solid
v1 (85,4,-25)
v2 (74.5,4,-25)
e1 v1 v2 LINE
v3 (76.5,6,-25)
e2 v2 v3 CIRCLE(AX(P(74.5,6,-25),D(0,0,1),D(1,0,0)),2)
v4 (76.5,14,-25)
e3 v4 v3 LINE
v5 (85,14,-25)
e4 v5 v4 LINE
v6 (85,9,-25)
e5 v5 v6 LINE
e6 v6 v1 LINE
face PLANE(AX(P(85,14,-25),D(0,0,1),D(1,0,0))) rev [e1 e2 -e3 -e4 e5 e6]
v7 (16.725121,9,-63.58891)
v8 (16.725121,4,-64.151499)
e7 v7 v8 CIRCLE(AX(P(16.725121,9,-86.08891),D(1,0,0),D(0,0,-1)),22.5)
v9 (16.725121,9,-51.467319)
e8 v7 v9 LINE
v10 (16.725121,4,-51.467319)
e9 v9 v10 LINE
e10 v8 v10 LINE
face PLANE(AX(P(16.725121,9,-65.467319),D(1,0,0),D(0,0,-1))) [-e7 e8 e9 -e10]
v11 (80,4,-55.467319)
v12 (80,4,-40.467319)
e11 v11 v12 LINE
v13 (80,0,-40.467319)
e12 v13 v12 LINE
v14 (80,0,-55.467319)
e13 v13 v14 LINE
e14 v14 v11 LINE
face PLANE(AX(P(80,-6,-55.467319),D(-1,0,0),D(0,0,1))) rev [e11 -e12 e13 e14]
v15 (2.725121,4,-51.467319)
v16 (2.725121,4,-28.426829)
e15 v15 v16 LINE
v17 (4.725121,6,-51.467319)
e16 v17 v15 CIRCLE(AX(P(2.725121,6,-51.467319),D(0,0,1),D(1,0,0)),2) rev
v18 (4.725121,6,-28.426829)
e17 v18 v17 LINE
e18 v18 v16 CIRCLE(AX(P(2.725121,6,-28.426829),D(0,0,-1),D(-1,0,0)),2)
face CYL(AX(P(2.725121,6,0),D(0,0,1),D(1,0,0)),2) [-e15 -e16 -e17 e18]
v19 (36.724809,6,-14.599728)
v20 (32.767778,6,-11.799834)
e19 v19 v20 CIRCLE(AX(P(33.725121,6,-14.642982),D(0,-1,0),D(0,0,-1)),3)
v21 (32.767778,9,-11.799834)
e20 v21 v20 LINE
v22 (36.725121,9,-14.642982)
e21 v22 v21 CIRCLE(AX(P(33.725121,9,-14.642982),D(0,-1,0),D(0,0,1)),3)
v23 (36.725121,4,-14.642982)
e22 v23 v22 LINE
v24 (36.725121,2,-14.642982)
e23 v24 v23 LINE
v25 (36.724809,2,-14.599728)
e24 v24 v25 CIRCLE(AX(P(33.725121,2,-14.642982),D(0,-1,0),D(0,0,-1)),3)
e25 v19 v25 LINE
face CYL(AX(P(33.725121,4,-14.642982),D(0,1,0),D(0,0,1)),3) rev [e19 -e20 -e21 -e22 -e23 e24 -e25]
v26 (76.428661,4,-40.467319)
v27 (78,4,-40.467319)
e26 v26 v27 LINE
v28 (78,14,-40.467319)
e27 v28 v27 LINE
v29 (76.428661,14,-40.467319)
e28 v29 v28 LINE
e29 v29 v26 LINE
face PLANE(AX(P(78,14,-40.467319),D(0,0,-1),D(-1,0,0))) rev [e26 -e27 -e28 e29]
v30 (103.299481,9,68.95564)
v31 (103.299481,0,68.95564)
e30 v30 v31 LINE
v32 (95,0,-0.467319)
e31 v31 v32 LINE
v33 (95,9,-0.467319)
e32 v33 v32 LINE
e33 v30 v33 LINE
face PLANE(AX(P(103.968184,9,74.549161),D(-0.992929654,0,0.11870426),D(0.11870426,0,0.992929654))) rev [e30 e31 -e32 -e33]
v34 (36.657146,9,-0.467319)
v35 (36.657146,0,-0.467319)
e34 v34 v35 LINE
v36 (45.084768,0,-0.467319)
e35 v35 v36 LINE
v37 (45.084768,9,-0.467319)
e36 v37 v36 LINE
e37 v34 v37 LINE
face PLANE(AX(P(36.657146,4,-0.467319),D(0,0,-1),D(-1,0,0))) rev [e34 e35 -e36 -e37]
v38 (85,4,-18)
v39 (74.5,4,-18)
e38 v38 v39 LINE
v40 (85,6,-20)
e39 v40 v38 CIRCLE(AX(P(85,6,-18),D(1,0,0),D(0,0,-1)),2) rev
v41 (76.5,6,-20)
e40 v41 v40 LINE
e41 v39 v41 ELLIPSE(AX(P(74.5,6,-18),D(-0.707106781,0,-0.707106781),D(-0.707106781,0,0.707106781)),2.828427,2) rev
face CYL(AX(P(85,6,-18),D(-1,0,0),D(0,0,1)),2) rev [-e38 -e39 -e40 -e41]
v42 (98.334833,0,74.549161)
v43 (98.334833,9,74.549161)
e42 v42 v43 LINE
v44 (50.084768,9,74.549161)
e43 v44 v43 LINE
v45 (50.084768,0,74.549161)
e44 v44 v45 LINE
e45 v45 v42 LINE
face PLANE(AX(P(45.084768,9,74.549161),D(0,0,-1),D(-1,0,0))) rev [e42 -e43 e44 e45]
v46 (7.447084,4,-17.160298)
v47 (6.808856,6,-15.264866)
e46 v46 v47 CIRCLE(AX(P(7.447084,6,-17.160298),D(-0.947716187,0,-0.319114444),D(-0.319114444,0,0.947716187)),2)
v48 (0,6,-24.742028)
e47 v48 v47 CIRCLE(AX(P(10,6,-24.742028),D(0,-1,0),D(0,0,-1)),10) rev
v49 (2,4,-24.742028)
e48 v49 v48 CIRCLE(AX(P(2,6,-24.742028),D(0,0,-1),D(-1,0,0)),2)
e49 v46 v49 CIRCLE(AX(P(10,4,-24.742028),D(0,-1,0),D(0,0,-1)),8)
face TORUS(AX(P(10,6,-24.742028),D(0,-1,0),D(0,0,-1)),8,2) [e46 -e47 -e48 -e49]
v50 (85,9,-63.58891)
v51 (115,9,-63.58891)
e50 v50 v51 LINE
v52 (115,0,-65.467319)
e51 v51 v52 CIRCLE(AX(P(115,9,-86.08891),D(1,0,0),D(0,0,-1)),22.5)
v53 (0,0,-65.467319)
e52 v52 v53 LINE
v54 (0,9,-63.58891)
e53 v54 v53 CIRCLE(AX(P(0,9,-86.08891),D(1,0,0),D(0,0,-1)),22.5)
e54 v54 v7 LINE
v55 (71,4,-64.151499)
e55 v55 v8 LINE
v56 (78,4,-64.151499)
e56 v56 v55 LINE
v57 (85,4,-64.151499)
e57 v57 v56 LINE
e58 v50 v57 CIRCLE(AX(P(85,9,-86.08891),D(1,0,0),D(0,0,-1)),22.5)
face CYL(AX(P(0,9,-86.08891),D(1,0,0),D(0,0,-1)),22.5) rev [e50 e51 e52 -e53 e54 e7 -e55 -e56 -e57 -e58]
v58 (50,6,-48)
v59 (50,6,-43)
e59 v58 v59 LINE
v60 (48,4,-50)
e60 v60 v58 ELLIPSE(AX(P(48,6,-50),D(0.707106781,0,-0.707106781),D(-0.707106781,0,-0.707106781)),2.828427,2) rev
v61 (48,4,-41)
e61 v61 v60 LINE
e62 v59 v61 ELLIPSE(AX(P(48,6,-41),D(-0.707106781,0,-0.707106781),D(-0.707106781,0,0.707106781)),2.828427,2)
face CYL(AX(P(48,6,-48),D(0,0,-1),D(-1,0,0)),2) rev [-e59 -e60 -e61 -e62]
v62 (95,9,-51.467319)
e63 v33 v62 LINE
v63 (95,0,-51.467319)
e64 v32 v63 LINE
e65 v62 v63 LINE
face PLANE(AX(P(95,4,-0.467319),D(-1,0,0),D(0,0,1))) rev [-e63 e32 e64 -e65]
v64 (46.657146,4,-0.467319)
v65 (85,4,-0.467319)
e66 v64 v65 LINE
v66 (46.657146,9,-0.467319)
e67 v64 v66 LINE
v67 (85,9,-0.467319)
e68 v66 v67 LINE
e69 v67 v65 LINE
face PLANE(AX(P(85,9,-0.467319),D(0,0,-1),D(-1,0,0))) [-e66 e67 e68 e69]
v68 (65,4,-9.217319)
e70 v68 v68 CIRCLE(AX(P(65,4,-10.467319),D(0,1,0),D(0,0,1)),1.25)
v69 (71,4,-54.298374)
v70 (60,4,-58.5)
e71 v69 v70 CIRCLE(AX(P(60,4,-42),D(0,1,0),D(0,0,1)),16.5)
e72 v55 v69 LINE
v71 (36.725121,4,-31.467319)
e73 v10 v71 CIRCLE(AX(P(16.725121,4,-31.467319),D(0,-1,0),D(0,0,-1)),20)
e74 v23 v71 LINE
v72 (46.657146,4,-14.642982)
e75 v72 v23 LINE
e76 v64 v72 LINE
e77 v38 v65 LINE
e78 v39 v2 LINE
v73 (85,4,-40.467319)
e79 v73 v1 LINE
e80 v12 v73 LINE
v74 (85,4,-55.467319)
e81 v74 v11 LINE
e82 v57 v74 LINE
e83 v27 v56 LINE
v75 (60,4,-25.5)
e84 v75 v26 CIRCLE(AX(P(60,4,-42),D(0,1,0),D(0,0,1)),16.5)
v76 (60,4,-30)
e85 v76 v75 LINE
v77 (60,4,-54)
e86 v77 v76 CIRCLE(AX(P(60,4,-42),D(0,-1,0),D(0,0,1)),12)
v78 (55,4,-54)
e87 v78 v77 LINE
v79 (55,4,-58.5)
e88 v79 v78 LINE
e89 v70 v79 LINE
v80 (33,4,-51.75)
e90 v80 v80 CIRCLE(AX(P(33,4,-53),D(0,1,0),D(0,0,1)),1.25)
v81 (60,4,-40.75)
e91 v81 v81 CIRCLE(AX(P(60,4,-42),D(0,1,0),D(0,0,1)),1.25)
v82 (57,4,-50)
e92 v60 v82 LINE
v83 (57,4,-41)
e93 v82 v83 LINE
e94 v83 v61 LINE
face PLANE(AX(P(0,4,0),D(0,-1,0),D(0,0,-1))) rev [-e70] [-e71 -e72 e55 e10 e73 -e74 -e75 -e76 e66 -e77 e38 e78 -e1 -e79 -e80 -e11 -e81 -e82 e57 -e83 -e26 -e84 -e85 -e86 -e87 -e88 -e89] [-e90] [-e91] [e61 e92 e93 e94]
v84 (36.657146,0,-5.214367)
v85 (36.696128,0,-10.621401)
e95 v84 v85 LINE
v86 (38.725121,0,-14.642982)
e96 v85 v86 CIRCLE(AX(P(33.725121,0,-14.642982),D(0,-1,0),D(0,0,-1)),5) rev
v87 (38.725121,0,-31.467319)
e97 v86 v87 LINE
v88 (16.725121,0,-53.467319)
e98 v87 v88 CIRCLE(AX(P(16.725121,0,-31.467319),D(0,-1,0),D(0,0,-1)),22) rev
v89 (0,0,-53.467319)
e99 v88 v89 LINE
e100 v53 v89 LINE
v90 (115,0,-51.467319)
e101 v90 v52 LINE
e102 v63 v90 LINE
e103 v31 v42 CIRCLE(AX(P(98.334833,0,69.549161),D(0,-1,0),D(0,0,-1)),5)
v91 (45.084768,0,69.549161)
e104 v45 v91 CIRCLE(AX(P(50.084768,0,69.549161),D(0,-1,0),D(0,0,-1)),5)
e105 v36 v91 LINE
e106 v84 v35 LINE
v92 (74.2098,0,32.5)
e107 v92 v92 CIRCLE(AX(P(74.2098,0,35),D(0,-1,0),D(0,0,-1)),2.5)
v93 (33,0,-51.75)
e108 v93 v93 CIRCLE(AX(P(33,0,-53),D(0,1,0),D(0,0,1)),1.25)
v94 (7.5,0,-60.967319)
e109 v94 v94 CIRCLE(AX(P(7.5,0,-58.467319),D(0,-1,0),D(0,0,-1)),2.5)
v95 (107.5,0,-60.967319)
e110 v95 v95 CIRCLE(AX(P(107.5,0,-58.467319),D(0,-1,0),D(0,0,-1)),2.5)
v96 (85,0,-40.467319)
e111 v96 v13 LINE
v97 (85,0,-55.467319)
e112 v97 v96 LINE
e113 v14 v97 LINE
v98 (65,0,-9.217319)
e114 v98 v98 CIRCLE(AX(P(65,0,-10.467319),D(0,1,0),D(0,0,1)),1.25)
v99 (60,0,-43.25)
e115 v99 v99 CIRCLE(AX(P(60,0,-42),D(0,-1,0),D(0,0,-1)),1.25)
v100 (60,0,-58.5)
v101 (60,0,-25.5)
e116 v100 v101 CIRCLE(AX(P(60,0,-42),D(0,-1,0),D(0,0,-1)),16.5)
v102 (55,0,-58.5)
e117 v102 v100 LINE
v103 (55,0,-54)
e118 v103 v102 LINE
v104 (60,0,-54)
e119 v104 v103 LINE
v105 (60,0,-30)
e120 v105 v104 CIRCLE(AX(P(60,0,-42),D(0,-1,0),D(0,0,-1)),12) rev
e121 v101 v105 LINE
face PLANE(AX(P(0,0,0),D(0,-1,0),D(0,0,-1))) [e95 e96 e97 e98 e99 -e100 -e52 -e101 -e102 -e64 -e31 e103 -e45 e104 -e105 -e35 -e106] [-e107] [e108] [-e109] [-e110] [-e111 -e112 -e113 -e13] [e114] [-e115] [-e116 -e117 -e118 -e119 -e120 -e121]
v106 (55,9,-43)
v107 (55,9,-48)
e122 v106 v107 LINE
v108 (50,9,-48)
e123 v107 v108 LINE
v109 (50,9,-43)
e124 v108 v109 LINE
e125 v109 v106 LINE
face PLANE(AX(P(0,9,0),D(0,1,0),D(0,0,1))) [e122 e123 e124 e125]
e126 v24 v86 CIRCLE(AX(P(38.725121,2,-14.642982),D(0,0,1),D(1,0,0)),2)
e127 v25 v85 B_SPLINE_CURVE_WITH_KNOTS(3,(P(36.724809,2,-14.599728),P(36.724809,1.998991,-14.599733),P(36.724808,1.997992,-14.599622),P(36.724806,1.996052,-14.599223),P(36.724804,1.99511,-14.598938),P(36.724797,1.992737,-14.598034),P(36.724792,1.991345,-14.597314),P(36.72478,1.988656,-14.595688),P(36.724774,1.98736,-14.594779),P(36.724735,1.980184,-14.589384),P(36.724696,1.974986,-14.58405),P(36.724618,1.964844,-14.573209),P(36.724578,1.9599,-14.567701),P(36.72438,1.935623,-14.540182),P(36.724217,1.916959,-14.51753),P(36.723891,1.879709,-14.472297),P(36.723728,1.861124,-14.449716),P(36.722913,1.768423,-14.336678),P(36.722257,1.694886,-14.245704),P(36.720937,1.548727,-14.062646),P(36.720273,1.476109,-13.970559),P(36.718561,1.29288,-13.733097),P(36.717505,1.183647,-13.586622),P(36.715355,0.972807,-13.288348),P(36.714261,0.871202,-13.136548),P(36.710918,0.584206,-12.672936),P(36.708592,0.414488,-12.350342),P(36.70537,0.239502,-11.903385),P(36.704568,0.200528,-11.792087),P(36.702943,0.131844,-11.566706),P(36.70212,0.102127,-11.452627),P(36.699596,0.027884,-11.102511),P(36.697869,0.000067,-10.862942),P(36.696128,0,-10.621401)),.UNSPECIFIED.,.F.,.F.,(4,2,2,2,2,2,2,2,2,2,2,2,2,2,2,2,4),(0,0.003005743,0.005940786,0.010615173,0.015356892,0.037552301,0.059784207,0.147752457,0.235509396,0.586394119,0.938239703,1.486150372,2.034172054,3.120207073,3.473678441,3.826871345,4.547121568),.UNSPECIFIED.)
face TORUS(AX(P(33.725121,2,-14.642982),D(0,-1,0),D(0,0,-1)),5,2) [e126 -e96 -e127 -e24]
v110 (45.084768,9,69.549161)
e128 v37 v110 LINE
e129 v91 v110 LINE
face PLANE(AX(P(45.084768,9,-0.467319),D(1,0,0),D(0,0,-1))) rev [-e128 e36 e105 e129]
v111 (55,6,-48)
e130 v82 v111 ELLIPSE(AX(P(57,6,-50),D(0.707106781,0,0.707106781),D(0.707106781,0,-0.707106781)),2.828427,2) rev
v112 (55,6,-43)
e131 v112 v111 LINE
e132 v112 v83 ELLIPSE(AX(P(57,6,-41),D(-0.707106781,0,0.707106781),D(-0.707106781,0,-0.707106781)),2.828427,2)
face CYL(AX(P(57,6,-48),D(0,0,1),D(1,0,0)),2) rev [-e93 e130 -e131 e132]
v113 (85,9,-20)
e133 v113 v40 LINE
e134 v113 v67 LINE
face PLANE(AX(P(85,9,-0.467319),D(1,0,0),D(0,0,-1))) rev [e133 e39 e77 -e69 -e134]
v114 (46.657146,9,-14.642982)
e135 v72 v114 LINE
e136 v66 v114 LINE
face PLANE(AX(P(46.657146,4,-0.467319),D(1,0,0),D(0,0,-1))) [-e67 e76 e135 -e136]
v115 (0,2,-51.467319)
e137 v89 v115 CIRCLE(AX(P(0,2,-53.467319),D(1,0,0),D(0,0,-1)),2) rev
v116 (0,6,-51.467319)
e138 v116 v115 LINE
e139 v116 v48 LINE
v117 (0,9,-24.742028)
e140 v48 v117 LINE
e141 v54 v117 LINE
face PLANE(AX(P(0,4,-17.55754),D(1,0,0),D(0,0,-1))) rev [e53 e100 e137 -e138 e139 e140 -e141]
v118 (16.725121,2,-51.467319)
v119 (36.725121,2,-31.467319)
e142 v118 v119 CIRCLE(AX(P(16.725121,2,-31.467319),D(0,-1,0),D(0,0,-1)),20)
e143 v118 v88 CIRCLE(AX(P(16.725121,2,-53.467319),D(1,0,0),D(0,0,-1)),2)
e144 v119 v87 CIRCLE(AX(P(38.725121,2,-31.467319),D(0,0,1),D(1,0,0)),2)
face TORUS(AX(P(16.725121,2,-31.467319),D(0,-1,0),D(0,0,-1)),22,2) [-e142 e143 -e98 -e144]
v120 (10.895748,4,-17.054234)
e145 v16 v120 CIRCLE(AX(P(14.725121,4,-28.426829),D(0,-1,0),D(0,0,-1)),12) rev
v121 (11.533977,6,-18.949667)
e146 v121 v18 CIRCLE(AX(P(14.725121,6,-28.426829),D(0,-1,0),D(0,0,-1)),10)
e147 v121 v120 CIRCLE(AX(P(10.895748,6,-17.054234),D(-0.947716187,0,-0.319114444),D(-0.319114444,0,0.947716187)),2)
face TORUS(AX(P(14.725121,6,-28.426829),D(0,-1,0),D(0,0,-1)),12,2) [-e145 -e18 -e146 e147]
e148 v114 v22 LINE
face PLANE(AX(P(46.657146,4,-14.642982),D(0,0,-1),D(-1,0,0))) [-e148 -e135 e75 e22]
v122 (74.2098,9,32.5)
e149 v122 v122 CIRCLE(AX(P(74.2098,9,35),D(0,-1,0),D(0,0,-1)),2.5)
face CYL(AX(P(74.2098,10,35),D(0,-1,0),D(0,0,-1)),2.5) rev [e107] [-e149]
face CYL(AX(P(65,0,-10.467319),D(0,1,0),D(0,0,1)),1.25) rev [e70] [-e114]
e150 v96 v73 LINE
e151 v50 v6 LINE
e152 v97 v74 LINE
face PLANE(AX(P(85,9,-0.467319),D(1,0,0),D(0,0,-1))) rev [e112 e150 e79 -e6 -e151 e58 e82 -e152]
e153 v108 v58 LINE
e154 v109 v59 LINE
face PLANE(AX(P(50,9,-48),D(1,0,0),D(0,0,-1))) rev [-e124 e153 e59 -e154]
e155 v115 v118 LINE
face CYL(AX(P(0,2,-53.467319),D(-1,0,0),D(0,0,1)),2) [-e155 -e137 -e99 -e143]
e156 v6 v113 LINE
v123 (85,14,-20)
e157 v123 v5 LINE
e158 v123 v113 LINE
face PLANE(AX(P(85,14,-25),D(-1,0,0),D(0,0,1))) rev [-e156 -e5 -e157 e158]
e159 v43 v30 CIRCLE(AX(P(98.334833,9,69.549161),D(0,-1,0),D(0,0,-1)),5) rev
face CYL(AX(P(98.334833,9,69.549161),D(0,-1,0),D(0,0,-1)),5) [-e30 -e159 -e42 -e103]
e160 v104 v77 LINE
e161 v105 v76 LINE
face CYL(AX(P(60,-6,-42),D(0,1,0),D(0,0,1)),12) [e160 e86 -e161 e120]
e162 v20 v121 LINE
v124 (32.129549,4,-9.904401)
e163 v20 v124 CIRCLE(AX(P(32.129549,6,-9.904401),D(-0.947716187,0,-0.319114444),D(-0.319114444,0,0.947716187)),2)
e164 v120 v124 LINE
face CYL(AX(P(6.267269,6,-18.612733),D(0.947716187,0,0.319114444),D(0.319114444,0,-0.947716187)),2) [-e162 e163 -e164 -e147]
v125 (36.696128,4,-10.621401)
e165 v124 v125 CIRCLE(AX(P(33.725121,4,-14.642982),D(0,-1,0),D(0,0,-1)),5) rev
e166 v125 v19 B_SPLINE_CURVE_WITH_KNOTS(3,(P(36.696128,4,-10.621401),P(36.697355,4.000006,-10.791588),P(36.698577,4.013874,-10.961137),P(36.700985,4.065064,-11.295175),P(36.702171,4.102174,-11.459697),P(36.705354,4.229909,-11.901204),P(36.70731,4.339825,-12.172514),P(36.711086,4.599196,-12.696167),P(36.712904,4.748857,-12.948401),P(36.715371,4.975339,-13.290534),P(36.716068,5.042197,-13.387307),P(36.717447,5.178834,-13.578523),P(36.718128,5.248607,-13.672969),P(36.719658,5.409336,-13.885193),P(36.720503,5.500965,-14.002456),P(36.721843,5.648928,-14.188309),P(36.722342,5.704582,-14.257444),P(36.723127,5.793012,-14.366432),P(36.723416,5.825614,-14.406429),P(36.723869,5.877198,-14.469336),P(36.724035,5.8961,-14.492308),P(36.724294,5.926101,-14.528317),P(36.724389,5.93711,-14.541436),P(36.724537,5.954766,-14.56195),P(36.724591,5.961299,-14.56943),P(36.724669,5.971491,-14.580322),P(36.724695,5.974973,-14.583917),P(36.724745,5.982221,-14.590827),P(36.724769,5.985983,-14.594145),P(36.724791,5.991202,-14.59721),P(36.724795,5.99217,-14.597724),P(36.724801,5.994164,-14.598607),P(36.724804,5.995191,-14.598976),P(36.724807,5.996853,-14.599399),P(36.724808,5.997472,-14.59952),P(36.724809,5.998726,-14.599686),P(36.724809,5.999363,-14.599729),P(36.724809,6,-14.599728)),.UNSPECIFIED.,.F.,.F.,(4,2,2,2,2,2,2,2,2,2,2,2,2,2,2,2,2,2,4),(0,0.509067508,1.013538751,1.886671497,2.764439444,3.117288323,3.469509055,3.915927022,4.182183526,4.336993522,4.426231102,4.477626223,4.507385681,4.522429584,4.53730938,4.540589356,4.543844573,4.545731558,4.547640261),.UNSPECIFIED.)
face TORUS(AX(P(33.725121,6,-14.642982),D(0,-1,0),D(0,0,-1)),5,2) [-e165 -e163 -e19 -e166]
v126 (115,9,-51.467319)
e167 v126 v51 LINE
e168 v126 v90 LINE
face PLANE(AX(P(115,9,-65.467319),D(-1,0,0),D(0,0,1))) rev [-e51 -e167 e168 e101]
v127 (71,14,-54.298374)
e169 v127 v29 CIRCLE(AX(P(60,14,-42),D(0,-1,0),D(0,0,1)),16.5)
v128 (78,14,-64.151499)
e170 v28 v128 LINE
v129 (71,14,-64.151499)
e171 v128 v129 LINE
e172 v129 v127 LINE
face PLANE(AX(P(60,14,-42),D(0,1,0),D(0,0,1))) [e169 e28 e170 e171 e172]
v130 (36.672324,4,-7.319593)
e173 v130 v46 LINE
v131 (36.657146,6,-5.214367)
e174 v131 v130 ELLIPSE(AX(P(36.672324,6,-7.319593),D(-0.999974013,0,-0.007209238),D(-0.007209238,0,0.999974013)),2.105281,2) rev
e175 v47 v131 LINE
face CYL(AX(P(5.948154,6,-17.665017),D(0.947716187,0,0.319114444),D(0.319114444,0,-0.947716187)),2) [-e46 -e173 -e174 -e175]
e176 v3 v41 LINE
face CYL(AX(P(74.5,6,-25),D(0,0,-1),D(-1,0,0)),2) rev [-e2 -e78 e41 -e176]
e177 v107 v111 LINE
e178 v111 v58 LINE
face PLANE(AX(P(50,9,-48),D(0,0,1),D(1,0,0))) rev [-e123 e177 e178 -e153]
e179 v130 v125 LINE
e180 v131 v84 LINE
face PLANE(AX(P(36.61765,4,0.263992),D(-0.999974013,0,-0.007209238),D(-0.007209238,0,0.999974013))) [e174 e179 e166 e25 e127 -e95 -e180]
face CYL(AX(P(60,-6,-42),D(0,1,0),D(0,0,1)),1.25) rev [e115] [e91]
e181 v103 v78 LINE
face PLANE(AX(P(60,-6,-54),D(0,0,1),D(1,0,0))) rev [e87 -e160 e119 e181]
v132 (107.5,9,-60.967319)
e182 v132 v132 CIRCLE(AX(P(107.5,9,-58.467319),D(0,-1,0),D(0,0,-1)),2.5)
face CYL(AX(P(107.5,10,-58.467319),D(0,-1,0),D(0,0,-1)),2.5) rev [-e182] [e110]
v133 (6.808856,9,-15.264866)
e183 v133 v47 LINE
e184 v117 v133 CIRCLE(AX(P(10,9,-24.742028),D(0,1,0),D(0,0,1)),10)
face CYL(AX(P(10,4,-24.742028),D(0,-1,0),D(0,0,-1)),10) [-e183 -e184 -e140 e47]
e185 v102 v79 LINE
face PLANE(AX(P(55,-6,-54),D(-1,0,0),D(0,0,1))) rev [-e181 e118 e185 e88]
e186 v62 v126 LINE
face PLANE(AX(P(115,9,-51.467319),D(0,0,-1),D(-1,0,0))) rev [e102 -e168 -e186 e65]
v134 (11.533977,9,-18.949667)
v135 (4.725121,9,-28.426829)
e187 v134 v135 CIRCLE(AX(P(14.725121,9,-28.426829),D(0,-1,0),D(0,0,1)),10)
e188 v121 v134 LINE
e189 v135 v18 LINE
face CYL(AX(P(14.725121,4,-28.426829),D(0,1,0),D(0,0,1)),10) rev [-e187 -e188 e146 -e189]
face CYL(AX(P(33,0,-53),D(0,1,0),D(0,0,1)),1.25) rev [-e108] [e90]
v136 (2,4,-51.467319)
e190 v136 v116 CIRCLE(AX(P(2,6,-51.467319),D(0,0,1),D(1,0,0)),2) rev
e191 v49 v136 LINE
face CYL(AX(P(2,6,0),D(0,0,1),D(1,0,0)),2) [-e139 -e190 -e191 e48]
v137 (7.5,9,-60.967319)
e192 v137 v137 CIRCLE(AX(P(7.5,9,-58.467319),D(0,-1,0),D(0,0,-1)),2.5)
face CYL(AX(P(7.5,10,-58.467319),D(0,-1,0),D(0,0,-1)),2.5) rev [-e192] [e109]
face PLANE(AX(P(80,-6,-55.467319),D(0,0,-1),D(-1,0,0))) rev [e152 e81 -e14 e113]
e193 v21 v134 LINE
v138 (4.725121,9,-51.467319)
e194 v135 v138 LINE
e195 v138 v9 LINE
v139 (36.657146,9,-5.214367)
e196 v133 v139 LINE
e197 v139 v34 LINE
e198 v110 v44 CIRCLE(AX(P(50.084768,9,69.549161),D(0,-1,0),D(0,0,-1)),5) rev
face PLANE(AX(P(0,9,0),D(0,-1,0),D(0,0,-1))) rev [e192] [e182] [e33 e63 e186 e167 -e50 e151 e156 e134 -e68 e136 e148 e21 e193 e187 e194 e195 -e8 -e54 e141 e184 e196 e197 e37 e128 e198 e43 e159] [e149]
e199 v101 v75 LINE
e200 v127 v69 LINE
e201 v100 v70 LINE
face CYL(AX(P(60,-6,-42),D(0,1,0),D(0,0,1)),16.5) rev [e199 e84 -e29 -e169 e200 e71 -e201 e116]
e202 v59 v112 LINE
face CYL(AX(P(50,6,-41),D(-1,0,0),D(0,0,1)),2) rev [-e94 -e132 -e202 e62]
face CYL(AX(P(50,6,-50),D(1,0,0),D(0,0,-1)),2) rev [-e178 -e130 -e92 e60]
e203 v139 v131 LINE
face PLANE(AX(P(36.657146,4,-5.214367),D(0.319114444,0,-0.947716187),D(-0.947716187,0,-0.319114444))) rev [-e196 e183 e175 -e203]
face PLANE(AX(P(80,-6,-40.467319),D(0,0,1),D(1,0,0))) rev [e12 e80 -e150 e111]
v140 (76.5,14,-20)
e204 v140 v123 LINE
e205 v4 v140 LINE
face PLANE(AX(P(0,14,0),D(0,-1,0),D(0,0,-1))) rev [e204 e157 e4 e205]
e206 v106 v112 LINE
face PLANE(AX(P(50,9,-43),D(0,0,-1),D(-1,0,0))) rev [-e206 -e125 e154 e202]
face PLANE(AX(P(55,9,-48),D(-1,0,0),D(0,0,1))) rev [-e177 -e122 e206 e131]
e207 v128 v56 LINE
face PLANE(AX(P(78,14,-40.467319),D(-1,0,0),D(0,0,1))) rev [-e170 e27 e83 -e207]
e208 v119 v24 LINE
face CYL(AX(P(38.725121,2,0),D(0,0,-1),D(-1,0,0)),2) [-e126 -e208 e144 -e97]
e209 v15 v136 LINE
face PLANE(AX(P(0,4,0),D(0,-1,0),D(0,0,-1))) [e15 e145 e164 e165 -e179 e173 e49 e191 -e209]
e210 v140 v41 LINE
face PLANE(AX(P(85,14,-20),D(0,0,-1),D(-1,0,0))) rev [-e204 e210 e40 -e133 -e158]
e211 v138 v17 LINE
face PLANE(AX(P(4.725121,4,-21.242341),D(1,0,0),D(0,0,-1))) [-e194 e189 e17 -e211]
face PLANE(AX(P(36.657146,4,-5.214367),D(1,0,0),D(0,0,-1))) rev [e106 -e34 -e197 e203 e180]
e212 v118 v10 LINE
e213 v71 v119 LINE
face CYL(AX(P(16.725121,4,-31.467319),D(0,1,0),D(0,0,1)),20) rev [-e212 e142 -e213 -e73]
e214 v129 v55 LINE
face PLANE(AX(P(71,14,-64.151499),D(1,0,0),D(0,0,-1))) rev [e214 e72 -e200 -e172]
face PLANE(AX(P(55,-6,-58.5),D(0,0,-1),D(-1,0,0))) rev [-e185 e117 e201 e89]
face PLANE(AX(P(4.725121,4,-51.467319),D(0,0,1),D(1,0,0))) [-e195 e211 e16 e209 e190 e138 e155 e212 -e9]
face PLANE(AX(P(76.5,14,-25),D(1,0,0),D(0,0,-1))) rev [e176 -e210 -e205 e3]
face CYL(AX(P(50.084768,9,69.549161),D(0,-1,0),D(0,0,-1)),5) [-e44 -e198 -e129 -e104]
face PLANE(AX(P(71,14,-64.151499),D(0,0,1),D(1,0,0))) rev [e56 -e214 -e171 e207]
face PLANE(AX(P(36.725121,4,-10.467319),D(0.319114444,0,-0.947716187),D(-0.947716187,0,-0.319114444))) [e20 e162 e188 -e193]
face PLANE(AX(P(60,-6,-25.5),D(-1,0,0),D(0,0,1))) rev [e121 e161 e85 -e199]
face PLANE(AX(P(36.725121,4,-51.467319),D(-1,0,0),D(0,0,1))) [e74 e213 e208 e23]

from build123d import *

# Parameters (mm, degrees)
SALIENTE_EXTRUIR1_DEPTH  = 4
REDONDEO1_R              = 20
REDONDEO2_R              = 10
REDONDEO3_R              = 3
CROQUIS2_R               = 1.25
CORTAR_EXTRUIR1_DEPTH    = 4
SALIENTE_EXTRUIR2_DEPTH  = 9
CROQUIS4_W               = 16.725121099
CROQUIS4_H               = 14
SALIENTE_EXTRUIR3_DEPTH  = 5
SALIENTE_EXTRUIR4_DEPTH  = 5
CORTAR_EXTRUIR2_START    = -4
CORTAR_EXTRUIR2_DEPTH    = 4
SALIENTE_EXTRUIR8_DEPTH  = 9
REDONDEO4_R              = 5
CORTAR_EXTRUIR3_DEPTH    = 115
CROQUIS11_R              = 2.5
CORTAR_EXTRUIR4_DEPTH    = 10
CROQUIS12_W              = 5
CROQUIS12_H              = 5
SALIENTE_EXTRUIR9_DEPTH  = 5
CROQUIS13_R              = 1.25
CROQUIS13_W              = 5
CROQUIS13_H              = 15
CORTAR_EXTRUIR5_DEPTH    = 10
SALIENTE_EXTRUIR10_START = 10
CROQUIS14_W              = 8.5
CROQUIS14_H              = 5
SALIENTE_EXTRUIR10_DEPTH = 10
REDONDEO5_R              = 2


with BuildPart() as part:
    # Croquis1 → Saliente-Extruir1 (new body)
    with BuildSketch(Plane(origin=(0, 0, 0), x_dir=(1, 0, 0), z_dir=(0, 1, 0))):
        Polygon((36.657146199, 0.467319271), (95, 0.467319271), (95, 65.467319271), (0, 65.467319271), (0, 17.557539605), (36.657146199, 5.214366653), align=None)
        Polygon((4.725121099, 51.467319271), (36.725121099, 51.467319271), (36.725121099, 10.467319271), (4.725121099, 21.242340663), align=None, mode=Mode.SUBTRACT)
    extrude(amount=SALIENTE_EXTRUIR1_DEPTH)

    # Redondeo1
    redondeo1_edges = [part.edges().sort_by_distance(p)[0] for p in [
        (36.725121099, 2, -51.467319271),
    ]]
    fillet(redondeo1_edges, radius=REDONDEO1_R)

    # Redondeo2
    redondeo2_edges = [part.edges().sort_by_distance(p)[0] for p in [
        (0, 2, -17.557539605),
        (4.725121099, 2, -21.242340663),
    ]]
    fillet(redondeo2_edges, radius=REDONDEO2_R)

    # Redondeo3
    redondeo3_edges = [part.edges().sort_by_distance(p)[0] for p in [
        (36.725121099, 2, -10.467319271),
    ]]
    fillet(redondeo3_edges, radius=REDONDEO3_R)

    # Croquis2 → Cortar-Extruir1 (cut)
    with BuildSketch(Plane(origin=(0, 4, 0), x_dir=(1, 0, 0), z_dir=(0, 1, 0))):
        with Locations(Location((33, 53, 0), (0, 0, 270))):
            Circle(CROQUIS2_R)
        with Locations(Location((65, 10.467319271, 0), (0, 0, 270))):
            Circle(CROQUIS2_R)
    extrude(amount=-CORTAR_EXTRUIR1_DEPTH, mode=Mode.SUBTRACT)

    # Croquis3 → Saliente-Extruir2 (add)
    with BuildSketch(Plane(origin=(0, 0, 0), x_dir=(1, 0, 0), z_dir=(0, 1, 0))):
        Polygon((115, 65.467319271), (115, 51.467319271), (95, 51.467319271), (95, 0.467319271), (85, 0.467319271), (85, 65.467319271), align=None)
    extrude(amount=SALIENTE_EXTRUIR2_DEPTH)

    # Croquis4 → Saliente-Extruir3 (add)
    with BuildSketch(Plane(origin=(0, 4, 0), x_dir=(1, 0, 0), z_dir=(0, 1, 0))):
        with Locations((8.36256055, 58.467319271)):
            Rectangle(CROQUIS4_W, CROQUIS4_H)
    extrude(amount=SALIENTE_EXTRUIR3_DEPTH)

    # Croquis5 → Saliente-Extruir4 (add)
    with BuildSketch(Plane(origin=(0, 9, 0), x_dir=(1, 0, 0), z_dir=(0, 1, 0))):
        with BuildLine():
            Line((11.533976664, 18.949666776), (32.767777769, 11.799833616))
            ThreePointArc((32.767777769, 11.799833616), (35.475545335, 12.206588327), (36.725121099, 14.642982178))
            Line((36.725121099, 14.642982178), (46.657146199, 14.642982178))
            Line((46.657146199, 14.642982178), (46.657146199, 0.467319271))
            Line((46.657146199, 0.467319271), (36.657146199, 0.467319271))
            Line((36.657146199, 0.467319271), (36.657146199, 5.214366653))
            Line((36.657146199, 5.214366653), (6.808855565, 15.264865719))
            ThreePointArc((6.808855565, 15.264865719), (1.878687164, 18.907280142), (0, 24.742027593))
            Line((0, 24.742027593), (0, 51.467319271))
            Line((0, 51.467319271), (4.725121099, 51.467319271))
            Line((4.725121099, 51.467319271), (4.725121099, 28.426828651))
            ThreePointArc((4.725121099, 28.426828651), (6.603808263, 22.592081199), (11.533976664, 18.949666776))
        make_face()
    extrude(amount=-SALIENTE_EXTRUIR4_DEPTH)

    # Cortar-Extruir2: read off the stored shape, not the designer's step
    # Cortar-Extruir2 outline → Cortar-Extruir2 (cut)
    with BuildSketch(Plane.XZ.offset(CORTAR_EXTRUIR2_START)):
        with BuildLine():
            Line((0, -51.467319271), (4.725121099, -51.467319271))
            Line((4.725121099, -51.467319271), (4.725121099, -28.426828651))
            ThreePointArc((4.725121099, -28.426828651), (6.603808263, -22.592081199), (11.533976664, -18.949666776))
            Line((11.533976664, -18.949666776), (32.767777769, -11.799833616))
            ThreePointArc((32.767777769, -11.799833616), (35.457935304, -12.194032416), (36.72480926, -14.599727874))
            Line((36.72480926, -14.599727874), (36.657146199, -5.214366653))
            Line((36.657146199, -5.214366653), (6.808855565, -15.264865719))
            ThreePointArc((6.808855565, -15.264865719), (1.878687164, -18.907280142), (0, -24.742027593))
            Line((0, -24.742027593), (0, -51.467319271))
        make_face()
    extrude(amount=CORTAR_EXTRUIR2_DEPTH, mode=Mode.SUBTRACT)

    # Croquis8 → Saliente-Extruir8 (add)
    with BuildSketch(Plane(origin=(0, 0, 0), x_dir=(1, 0, 0), z_dir=(0, 1, 0))):
        Polygon((45.084767614, -74.549161415), (103.968184017, -74.549161415), (95, 0.467319271), (85, 0.467319271), (46.657146199, 0.467319271), (45.084767614, 0.467319271), align=None)
    extrude(amount=SALIENTE_EXTRUIR8_DEPTH)

    # Redondeo4
    redondeo4_edges = [part.edges().sort_by_distance(p)[0] for p in [
        (45.084767614, 4.5, 74.549161415),
        (103.968184017, 4.5, 74.549161415),
    ]]
    fillet(redondeo4_edges, radius=REDONDEO4_R)

    # Croquis10 → Cortar-Extruir3 (cut)
    with BuildSketch(Plane(origin=(115, 0, 0), x_dir=(0, 0, -1), z_dir=(1, 0, 0))):
        with BuildLine():
            Line((65.467319271, 9), (65.467319271, 0))
            ThreePointArc((65.467319271, 0), (64.063517857, 4.403033017), (63.588909898, 9))
            Line((63.588909898, 9), (65.467319271, 9))
        make_face()
    extrude(amount=-CORTAR_EXTRUIR3_DEPTH, mode=Mode.SUBTRACT)

    # Croquis11 → Cortar-Extruir4 (cut)
    with BuildSketch(Plane.XZ):
        with Locations(Location((7.5, -58.467319271, 0), (0, 0, 270))):
            Circle(CROQUIS11_R)
        with Locations(Location((107.5, -58.467319271, 0), (0, 0, 270))):
            Circle(CROQUIS11_R)
        with Locations(Location((74.209800295, 35, 0), (0, 0, 270))):
            Circle(CROQUIS11_R)
    extrude(amount=-CORTAR_EXTRUIR4_DEPTH, mode=Mode.SUBTRACT)

    # Croquis12 → Saliente-Extruir9 (add)
    with BuildSketch(Plane(origin=(0, 4, 0), x_dir=(1, 0, 0), z_dir=(0, 1, 0))):
        with Locations((52.5, 45.5)):
            Rectangle(CROQUIS12_W, CROQUIS12_H)
    extrude(amount=SALIENTE_EXTRUIR9_DEPTH)

    # Croquis13 → Cortar-Extruir5 (cut)
    with BuildSketch(Plane(origin=(0, 4, 0), x_dir=(1, 0, 0), z_dir=(0, 1, 0))):
        with Locations(Location((60, 42, 0), (0, 0, 270))):
            Circle(CROQUIS13_R)
        with BuildLine():
            Line((60, 25.5), (60, 30))
            ThreePointArc((60, 30), (72, 42), (60, 54))
            Line((60, 54), (55, 54))
            Line((55, 54), (55, 58.5))
            Line((55, 58.5), (60, 58.5))
            ThreePointArc((60, 58.5), (76.5, 42), (60, 25.5))
        make_face()
        with Locations((82.5, 47.967319271)):
            Rectangle(CROQUIS13_W, CROQUIS13_H)
    extrude(amount=-CORTAR_EXTRUIR5_DEPTH, mode=Mode.SUBTRACT)

    # Croquis14 → Saliente-Extruir10 (add)
    with BuildSketch(Plane(origin=(0, 4, 0), x_dir=(1, 0, 0), z_dir=(0, 1, 0)).offset(SALIENTE_EXTRUIR10_START)):
        with BuildLine():
            Line((78, 40.467319271), (76.42866062, 40.467319271))
            ThreePointArc((76.42866062, 40.467319271), (75.359276472, 48.028484575), (71, 54.298373876))
            Line((71, 54.298373876), (71, 64.151498929))
            Line((71, 64.151498929), (78, 64.151498929))
            Line((78, 64.151498929), (78, 40.467319271))
        make_face()
        with Locations((80.75, 22.5)):
            Rectangle(CROQUIS14_W, CROQUIS14_H)
    extrude(amount=-SALIENTE_EXTRUIR10_DEPTH)

    # Redondeo5
    # the kernel refuses this fillet: 2 mm, written as the material it adds along each edge
    with BuildSketch(Plane(origin=(50, 4, -43), x_dir=(-1, 0, 0), z_dir=(0, 0, -1)), Plane(origin=(55, 4, -43), x_dir=(0, 0, 1), z_dir=(-1, 0, 0)), Plane(origin=(55, 4, -48), x_dir=(1, 0, 0), z_dir=(0, 0, 1)), Plane(origin=(50, 4, -48), x_dir=(0, 0, -1), z_dir=(1, 0, 0))) as redondeo5_piece_1:
        with BuildLine():
            CenterArc((REDONDEO5_R, REDONDEO5_R), REDONDEO5_R, 180, 90)
            Line((0, REDONDEO5_R), (0, 0))
            Line((0, 0), (REDONDEO5_R, 0))
        make_face()
    extrude(amount=5)
    with BuildSketch(Plane(origin=(76.5, 4, -25), x_dir=(-1, 0, 0), z_dir=(0, 0, 1))) as redondeo5_piece_2:
        with BuildLine():
            CenterArc((REDONDEO5_R, -REDONDEO5_R), REDONDEO5_R, 90, 90)
            Line((0, -REDONDEO5_R), (0, 0))
            Line((0, 0), (REDONDEO5_R, 0))
        make_face()
    extrude(amount=5)
    with BuildSketch(Plane(origin=(76.5, 4, -20), x_dir=(0, 0, 1), z_dir=(1, 0, 0))) as redondeo5_piece_3:
        with BuildLine():
            CenterArc((REDONDEO5_R, -REDONDEO5_R), REDONDEO5_R, 90, 90)
            Line((0, -REDONDEO5_R), (0, 0))
            Line((0, 0), (REDONDEO5_R, 0))
        make_face()
    extrude(amount=13.5)
    with BuildSketch(Plane(origin=(50, 4, -38), x_dir=(-1, 0, 0), z_dir=(0, 0, -1))) as redondeo5_piece_4a_section:
        with BuildLine():
            CenterArc((REDONDEO5_R, REDONDEO5_R), REDONDEO5_R, 180, 90)
            Line((0, REDONDEO5_R), (0, 0))
            Line((0, 0), (REDONDEO5_R, 0))
        make_face()
    redondeo5_piece_4a = extrude(amount=10, mode=Mode.PRIVATE)
    redondeo5_piece_4a = split(redondeo5_piece_4a, bisect_by=Plane(origin=(50, 4, -43), z_dir=(0, 0, 1)), keep=Keep.TOP, mode=Mode.PRIVATE)
    with BuildSketch(Plane(origin=(55, 4, -43), x_dir=(0, 0, 1), z_dir=(-1, 0, 0))) as redondeo5_piece_4b_section:
        with BuildLine():
            CenterArc((REDONDEO5_R, REDONDEO5_R), REDONDEO5_R, 180, 90)
            Line((0, REDONDEO5_R), (0, 0))
            Line((0, 0), (REDONDEO5_R, 0))
        make_face()
    redondeo5_piece_4b = extrude(amount=10, mode=Mode.PRIVATE)
    redondeo5_piece_4b = split(redondeo5_piece_4b, bisect_by=Plane(origin=(50, 4, -43), z_dir=(-1, 0, 0)), keep=Keep.TOP, mode=Mode.PRIVATE)
    redondeo5_piece_4 = redondeo5_piece_4a & redondeo5_piece_4b
    add(redondeo5_piece_4)
    with BuildSketch(Plane(origin=(50, 4, -43), x_dir=(-1, 0, 0), z_dir=(0, 0, -1))) as redondeo5_piece_5a_section:
        with BuildLine():
            CenterArc((REDONDEO5_R, REDONDEO5_R), REDONDEO5_R, 180, 90)
            Line((0, REDONDEO5_R), (0, 0))
            Line((0, 0), (REDONDEO5_R, 0))
        make_face()
    redondeo5_piece_5a = extrude(amount=10, mode=Mode.PRIVATE)
    redondeo5_piece_5a = split(redondeo5_piece_5a, bisect_by=Plane(origin=(50, 4, -48), z_dir=(0, 0, -1)), keep=Keep.TOP, mode=Mode.PRIVATE)
    with BuildSketch(Plane(origin=(45, 4, -48), x_dir=(0, 0, -1), z_dir=(1, 0, 0))) as redondeo5_piece_5b_section:
        with BuildLine():
            CenterArc((REDONDEO5_R, REDONDEO5_R), REDONDEO5_R, 180, 90)
            Line((0, REDONDEO5_R), (0, 0))
            Line((0, 0), (REDONDEO5_R, 0))
        make_face()
    redondeo5_piece_5b = extrude(amount=10, mode=Mode.PRIVATE)
    redondeo5_piece_5b = split(redondeo5_piece_5b, bisect_by=Plane(origin=(50, 4, -48), z_dir=(-1, 0, 0)), keep=Keep.TOP, mode=Mode.PRIVATE)
    redondeo5_piece_5 = redondeo5_piece_5a & redondeo5_piece_5b
    add(redondeo5_piece_5)
    with BuildSketch(Plane(origin=(60, 4, -43), x_dir=(0, 0, 1), z_dir=(-1, 0, 0))) as redondeo5_piece_6a_section:
        with BuildLine():
            CenterArc((REDONDEO5_R, REDONDEO5_R), REDONDEO5_R, 180, 90)
            Line((0, REDONDEO5_R), (0, 0))
            Line((0, 0), (REDONDEO5_R, 0))
        make_face()
    redondeo5_piece_6a = extrude(amount=10, mode=Mode.PRIVATE)
    redondeo5_piece_6a = redondeo5_piece_6a - Plane(origin=(60, 4, -42), x_dir=(0, 0, 1), z_dir=(0, 1, 0)) * Cylinder(1.25, 28, mode=Mode.PRIVATE)
    redondeo5_piece_6a = split(redondeo5_piece_6a, bisect_by=Plane(origin=(55, 4, -43), z_dir=(1, 0, 0)), keep=Keep.TOP, mode=Mode.PRIVATE)
    with BuildSketch(Plane(origin=(55, 4, -48), x_dir=(1, 0, 0), z_dir=(0, 0, 1))) as redondeo5_piece_6b_section:
        with BuildLine():
            CenterArc((REDONDEO5_R, REDONDEO5_R), REDONDEO5_R, 180, 90)
            Line((0, REDONDEO5_R), (0, 0))
            Line((0, 0), (REDONDEO5_R, 0))
        make_face()
    redondeo5_piece_6b = extrude(amount=10, mode=Mode.PRIVATE)
    redondeo5_piece_6b = split(redondeo5_piece_6b, bisect_by=Plane(origin=(55, 4, -43), z_dir=(0, 0, 1)), keep=Keep.TOP, mode=Mode.PRIVATE)
    redondeo5_piece_6 = redondeo5_piece_6a & redondeo5_piece_6b
    add(redondeo5_piece_6)
    with BuildSketch(Plane(origin=(50, 4, -48), x_dir=(0, 0, -1), z_dir=(1, 0, 0))) as redondeo5_piece_7a_section:
        with BuildLine():
            CenterArc((REDONDEO5_R, REDONDEO5_R), REDONDEO5_R, 180, 90)
            Line((0, REDONDEO5_R), (0, 0))
            Line((0, 0), (REDONDEO5_R, 0))
        make_face()
    redondeo5_piece_7a = extrude(amount=10, mode=Mode.PRIVATE)
    redondeo5_piece_7a = split(redondeo5_piece_7a, bisect_by=Plane(origin=(55, 4, -48), z_dir=(1, 0, 0)), keep=Keep.TOP, mode=Mode.PRIVATE)
    with BuildSketch(Plane(origin=(55, 4, -53), x_dir=(1, 0, 0), z_dir=(0, 0, 1))) as redondeo5_piece_7b_section:
        with BuildLine():
            CenterArc((REDONDEO5_R, REDONDEO5_R), REDONDEO5_R, 180, 90)
            Line((0, REDONDEO5_R), (0, 0))
            Line((0, 0), (REDONDEO5_R, 0))
        make_face()
    redondeo5_piece_7b = extrude(amount=10, mode=Mode.PRIVATE)
    redondeo5_piece_7b = split(redondeo5_piece_7b, bisect_by=Plane(origin=(55, 4, -48), z_dir=(0, 0, -1)), keep=Keep.TOP, mode=Mode.PRIVATE)
    redondeo5_piece_7 = redondeo5_piece_7a & redondeo5_piece_7b
    add(redondeo5_piece_7)
    with BuildSketch(Plane(origin=(76.5, 4, -25), x_dir=(-1, 0, 0), z_dir=(0, 0, 1))) as redondeo5_piece_8a_section:
        with BuildLine():
            CenterArc((REDONDEO5_R, -REDONDEO5_R), REDONDEO5_R, 90, 90)
            Line((0, -REDONDEO5_R), (0, 0))
            Line((0, 0), (REDONDEO5_R, 0))
        make_face()
    redondeo5_piece_8a = extrude(amount=10, mode=Mode.PRIVATE)
    redondeo5_piece_8a = split(redondeo5_piece_8a, bisect_by=Plane(origin=(76.5, 4, -20), z_dir=(0, 0, 1)), keep=Keep.TOP, mode=Mode.PRIVATE)
    with BuildSketch(Plane(origin=(71.5, 4, -20), x_dir=(0, 0, 1), z_dir=(1, 0, 0))) as redondeo5_piece_8b_section:
        with BuildLine():
            CenterArc((REDONDEO5_R, -REDONDEO5_R), REDONDEO5_R, 90, 90)
            Line((0, -REDONDEO5_R), (0, 0))
            Line((0, 0), (REDONDEO5_R, 0))
        make_face()
    redondeo5_piece_8b = extrude(amount=13.5, mode=Mode.PRIVATE)
    redondeo5_piece_8b = split(redondeo5_piece_8b, bisect_by=Plane(origin=(76.5, 4, -20), z_dir=(-1, 0, 0)), keep=Keep.TOP, mode=Mode.PRIVATE)
    redondeo5_piece_8 = redondeo5_piece_8a & redondeo5_piece_8b
    add(redondeo5_piece_8)
    # the kernel refuses this fillet: 2 mm, written as the material it takes off along each edge
    with BuildSketch(Plane(origin=(33.725121099, 0, -14.642982178), x_dir=(-0.11006554678443577, 0, 0.9939243308275753), z_dir=(-0.9939243308275753, 0, -0.11006554678443577))) as redondeo5_2_piece_1:
        with BuildLine():
            CenterArc((3 + REDONDEO5_R, REDONDEO5_R), REDONDEO5_R, 180, 90)
            Line((3, REDONDEO5_R), (3, 0))
            Line((3, 0), (3 + REDONDEO5_R, 0))
        make_face()
    revolve(axis=Axis((33.725121099, 0, -14.642982178), (0, 1, 0)), revolution_arc=96.319094067, mode=Mode.SUBTRACT)
    with BuildSketch(Plane(origin=(33.725121101, 4, -14.642982175), x_dir=(-0.31911444425993896, 0, 0.9477161871914347), z_dir=(-0.9477161871914347, 0, -0.31911444425993896))) as redondeo5_2_piece_2_section:
        with BuildLine():
            CenterArc((2.999999998 + REDONDEO5_R, REDONDEO5_R), REDONDEO5_R, 180, 90)
            Line((2.999999998 - REDONDEO5_R * 4.36444880236e-10, REDONDEO5_R), (2.999999998, 0))
            Line((2.999999998, 0), (2.999999998 + REDONDEO5_R, 0))
        make_face()
    redondeo5_2_piece_2 = revolve(axis=Axis((33.725121101, 4, -14.642982175), (0, 1, 0)), revolution_arc=203.331243748, mode=Mode.PRIVATE)
    redondeo5_2_piece_2 = split(redondeo5_2_piece_2, bisect_by=Plane(origin=(36.724965179, 4, -14.621355023), z_dir=(-0.9999740131061556, 0, -0.007209237988178882)), keep=Keep.TOP, mode=Mode.PRIVATE)
    add(redondeo5_2_piece_2, mode=Mode.SUBTRACT)
    with BuildSketch(Plane(origin=(11.533976664, 4, -18.949666776), x_dir=(-0.3191144435113306, 0, 0.9477161874435056), z_dir=(0.9477161874435056, 0, 0.3191144435113306))) as redondeo5_2_piece_3:
        with BuildLine():
            CenterArc((REDONDEO5_R, -REDONDEO5_R), REDONDEO5_R, 90, 90)
            Line((0, -REDONDEO5_R), (0, 0))
            Line((0, 0), (REDONDEO5_R, 0))
        make_face()
    extrude(amount=22.405232058, mode=Mode.SUBTRACT)
    with BuildSketch(Plane(origin=(14.725121098, 4, -28.42682865), x_dir=(-1.0, 0, -9.385345834372306e-11), z_dir=(9.385345834372306e-11, 0, -1.0))) as redondeo5_2_piece_4:
        with BuildLine():
            CenterArc((9.999999999 + REDONDEO5_R, REDONDEO5_R), REDONDEO5_R, 180, 90)
            Line((9.999999999 - REDONDEO5_R * 2.13431050611e-10, REDONDEO5_R), (9.999999999, 0))
            Line((9.999999999, 0), (9.999999999 + REDONDEO5_R, 0))
        make_face()
    revolve(axis=Axis((14.725121098, 4, -28.42682865), (0, 1, 0)), revolution_arc=71.390621366, mode=Mode.SUBTRACT)
    with BuildSketch(Plane(origin=(4.725121099, 4, -51.467319271), x_dir=(1.166040597411211e-10, 1.0, 0), z_dir=(0, 0, 1))) as redondeo5_2_piece_5:
        with BuildLine():
            CenterArc((REDONDEO5_R, REDONDEO5_R), REDONDEO5_R, 180.000000007, 90)
            Line((-REDONDEO5_R * 1.16604059728e-10, REDONDEO5_R), (0, 0))
            Line((0, 0), (REDONDEO5_R, 0))
        make_face()
    extrude(amount=23.04049062, mode=Mode.SUBTRACT)
    with BuildSketch(Plane(origin=(0, 4, -24.742027593), x_dir=(1, 0, 0), z_dir=(0, 0, -1))) as redondeo5_2_piece_6:
        with BuildLine():
            CenterArc((REDONDEO5_R, -REDONDEO5_R), REDONDEO5_R, 90, 90)
            Line((0, -REDONDEO5_R), (0, 0))
            Line((0, 0), (REDONDEO5_R, 0))
        make_face()
    extrude(amount=26.725291678, mode=Mode.SUBTRACT)
    with BuildSketch(Plane(origin=(9.999999999, 4, -24.742027593), x_dir=(-0.3191144434609789, 0, 0.9477161874604599), z_dir=(0.9477161874604599, 0, 0.3191144434609789))) as redondeo5_2_piece_7:
        with BuildLine():
            CenterArc((9.999999999 - REDONDEO5_R, -REDONDEO5_R), REDONDEO5_R, 0, 90)
            Line((9.999999999 + REDONDEO5_R * 5.85504977835e-11, -REDONDEO5_R), (9.999999999, 0))
            Line((9.999999999, 0), (9.999999999 - REDONDEO5_R, 0))
        make_face()
    revolve(axis=Axis((9.999999999, 4, -24.742027593), (0, -1, 0)), revolution_arc=71.390621361, mode=Mode.SUBTRACT)
    with BuildSketch(Plane(origin=(41.395727136, 4, -3.618794435), x_dir=(0.31911444355046886, 0, -0.9477161874303269), z_dir=(-0.9477161874303269, 0, -0.31911444355046886))) as redondeo5_2_piece_8_section:
        with BuildLine():
            CenterArc((REDONDEO5_R, -REDONDEO5_R), REDONDEO5_R, 90, 90)
            Line((-REDONDEO5_R * 9.41127960718e-11, -REDONDEO5_R), (0, 0))
            Line((0, 0), (REDONDEO5_R, 0))
        make_face()
    redondeo5_2_piece_8 = extrude(amount=36.494967618, mode=Mode.PRIVATE)
    redondeo5_2_piece_8 = split(redondeo5_2_piece_8, bisect_by=Plane(origin=(36.645889917, 4, -3.653038032), z_dir=(-0.9999740131061556, 0, -0.007209237988178882)), keep=Keep.TOP, mode=Mode.PRIVATE)
    add(redondeo5_2_piece_8, mode=Mode.SUBTRACT)
    with BuildSketch(Plane(origin=(16.725121099, 0, -51.467319271), x_dir=(2.1424885652254232e-11, 0, -1.0), z_dir=(-1.0, 0, -2.1424885652254232e-11))) as redondeo5_2_piece_9:
        with BuildLine():
            CenterArc((REDONDEO5_R, -REDONDEO5_R), REDONDEO5_R, 90, 90)
            Line((-REDONDEO5_R * 8.95887808379e-11, -REDONDEO5_R), (0, 0))
            Line((0, 0), (REDONDEO5_R, 0))
        make_face()
    extrude(amount=21.725121099, mode=Mode.SUBTRACT)
    with BuildSketch(Plane(origin=(16.725121099, 0, -31.467319271), x_dir=(0, 0, -1), z_dir=(-1, 0, 0))) as redondeo5_2_piece_10:
        with BuildLine():
            CenterArc((20 + REDONDEO5_R, -REDONDEO5_R), REDONDEO5_R, 90, 90)
            Line((20, -REDONDEO5_R), (20, 0))
            Line((20, 0), (20 + REDONDEO5_R, 0))
        make_face()
    revolve(axis=Axis((16.725121099, 0, -31.467319271), (0, -1, 0)), revolution_arc=90, mode=Mode.SUBTRACT)
    with BuildSketch(Plane(origin=(36.725121099, 0, -31.467319271), x_dir=(1, 0, 0), z_dir=(0, 0, 1))) as redondeo5_2_piece_11:
        with BuildLine():
            CenterArc((REDONDEO5_R, REDONDEO5_R), REDONDEO5_R, 180, 90)
            Line((0, REDONDEO5_R), (0, 0))
            Line((0, 0), (REDONDEO5_R, 0))
        make_face()
    extrude(amount=16.824337093, mode=Mode.SUBTRACT)


solid = part.part
